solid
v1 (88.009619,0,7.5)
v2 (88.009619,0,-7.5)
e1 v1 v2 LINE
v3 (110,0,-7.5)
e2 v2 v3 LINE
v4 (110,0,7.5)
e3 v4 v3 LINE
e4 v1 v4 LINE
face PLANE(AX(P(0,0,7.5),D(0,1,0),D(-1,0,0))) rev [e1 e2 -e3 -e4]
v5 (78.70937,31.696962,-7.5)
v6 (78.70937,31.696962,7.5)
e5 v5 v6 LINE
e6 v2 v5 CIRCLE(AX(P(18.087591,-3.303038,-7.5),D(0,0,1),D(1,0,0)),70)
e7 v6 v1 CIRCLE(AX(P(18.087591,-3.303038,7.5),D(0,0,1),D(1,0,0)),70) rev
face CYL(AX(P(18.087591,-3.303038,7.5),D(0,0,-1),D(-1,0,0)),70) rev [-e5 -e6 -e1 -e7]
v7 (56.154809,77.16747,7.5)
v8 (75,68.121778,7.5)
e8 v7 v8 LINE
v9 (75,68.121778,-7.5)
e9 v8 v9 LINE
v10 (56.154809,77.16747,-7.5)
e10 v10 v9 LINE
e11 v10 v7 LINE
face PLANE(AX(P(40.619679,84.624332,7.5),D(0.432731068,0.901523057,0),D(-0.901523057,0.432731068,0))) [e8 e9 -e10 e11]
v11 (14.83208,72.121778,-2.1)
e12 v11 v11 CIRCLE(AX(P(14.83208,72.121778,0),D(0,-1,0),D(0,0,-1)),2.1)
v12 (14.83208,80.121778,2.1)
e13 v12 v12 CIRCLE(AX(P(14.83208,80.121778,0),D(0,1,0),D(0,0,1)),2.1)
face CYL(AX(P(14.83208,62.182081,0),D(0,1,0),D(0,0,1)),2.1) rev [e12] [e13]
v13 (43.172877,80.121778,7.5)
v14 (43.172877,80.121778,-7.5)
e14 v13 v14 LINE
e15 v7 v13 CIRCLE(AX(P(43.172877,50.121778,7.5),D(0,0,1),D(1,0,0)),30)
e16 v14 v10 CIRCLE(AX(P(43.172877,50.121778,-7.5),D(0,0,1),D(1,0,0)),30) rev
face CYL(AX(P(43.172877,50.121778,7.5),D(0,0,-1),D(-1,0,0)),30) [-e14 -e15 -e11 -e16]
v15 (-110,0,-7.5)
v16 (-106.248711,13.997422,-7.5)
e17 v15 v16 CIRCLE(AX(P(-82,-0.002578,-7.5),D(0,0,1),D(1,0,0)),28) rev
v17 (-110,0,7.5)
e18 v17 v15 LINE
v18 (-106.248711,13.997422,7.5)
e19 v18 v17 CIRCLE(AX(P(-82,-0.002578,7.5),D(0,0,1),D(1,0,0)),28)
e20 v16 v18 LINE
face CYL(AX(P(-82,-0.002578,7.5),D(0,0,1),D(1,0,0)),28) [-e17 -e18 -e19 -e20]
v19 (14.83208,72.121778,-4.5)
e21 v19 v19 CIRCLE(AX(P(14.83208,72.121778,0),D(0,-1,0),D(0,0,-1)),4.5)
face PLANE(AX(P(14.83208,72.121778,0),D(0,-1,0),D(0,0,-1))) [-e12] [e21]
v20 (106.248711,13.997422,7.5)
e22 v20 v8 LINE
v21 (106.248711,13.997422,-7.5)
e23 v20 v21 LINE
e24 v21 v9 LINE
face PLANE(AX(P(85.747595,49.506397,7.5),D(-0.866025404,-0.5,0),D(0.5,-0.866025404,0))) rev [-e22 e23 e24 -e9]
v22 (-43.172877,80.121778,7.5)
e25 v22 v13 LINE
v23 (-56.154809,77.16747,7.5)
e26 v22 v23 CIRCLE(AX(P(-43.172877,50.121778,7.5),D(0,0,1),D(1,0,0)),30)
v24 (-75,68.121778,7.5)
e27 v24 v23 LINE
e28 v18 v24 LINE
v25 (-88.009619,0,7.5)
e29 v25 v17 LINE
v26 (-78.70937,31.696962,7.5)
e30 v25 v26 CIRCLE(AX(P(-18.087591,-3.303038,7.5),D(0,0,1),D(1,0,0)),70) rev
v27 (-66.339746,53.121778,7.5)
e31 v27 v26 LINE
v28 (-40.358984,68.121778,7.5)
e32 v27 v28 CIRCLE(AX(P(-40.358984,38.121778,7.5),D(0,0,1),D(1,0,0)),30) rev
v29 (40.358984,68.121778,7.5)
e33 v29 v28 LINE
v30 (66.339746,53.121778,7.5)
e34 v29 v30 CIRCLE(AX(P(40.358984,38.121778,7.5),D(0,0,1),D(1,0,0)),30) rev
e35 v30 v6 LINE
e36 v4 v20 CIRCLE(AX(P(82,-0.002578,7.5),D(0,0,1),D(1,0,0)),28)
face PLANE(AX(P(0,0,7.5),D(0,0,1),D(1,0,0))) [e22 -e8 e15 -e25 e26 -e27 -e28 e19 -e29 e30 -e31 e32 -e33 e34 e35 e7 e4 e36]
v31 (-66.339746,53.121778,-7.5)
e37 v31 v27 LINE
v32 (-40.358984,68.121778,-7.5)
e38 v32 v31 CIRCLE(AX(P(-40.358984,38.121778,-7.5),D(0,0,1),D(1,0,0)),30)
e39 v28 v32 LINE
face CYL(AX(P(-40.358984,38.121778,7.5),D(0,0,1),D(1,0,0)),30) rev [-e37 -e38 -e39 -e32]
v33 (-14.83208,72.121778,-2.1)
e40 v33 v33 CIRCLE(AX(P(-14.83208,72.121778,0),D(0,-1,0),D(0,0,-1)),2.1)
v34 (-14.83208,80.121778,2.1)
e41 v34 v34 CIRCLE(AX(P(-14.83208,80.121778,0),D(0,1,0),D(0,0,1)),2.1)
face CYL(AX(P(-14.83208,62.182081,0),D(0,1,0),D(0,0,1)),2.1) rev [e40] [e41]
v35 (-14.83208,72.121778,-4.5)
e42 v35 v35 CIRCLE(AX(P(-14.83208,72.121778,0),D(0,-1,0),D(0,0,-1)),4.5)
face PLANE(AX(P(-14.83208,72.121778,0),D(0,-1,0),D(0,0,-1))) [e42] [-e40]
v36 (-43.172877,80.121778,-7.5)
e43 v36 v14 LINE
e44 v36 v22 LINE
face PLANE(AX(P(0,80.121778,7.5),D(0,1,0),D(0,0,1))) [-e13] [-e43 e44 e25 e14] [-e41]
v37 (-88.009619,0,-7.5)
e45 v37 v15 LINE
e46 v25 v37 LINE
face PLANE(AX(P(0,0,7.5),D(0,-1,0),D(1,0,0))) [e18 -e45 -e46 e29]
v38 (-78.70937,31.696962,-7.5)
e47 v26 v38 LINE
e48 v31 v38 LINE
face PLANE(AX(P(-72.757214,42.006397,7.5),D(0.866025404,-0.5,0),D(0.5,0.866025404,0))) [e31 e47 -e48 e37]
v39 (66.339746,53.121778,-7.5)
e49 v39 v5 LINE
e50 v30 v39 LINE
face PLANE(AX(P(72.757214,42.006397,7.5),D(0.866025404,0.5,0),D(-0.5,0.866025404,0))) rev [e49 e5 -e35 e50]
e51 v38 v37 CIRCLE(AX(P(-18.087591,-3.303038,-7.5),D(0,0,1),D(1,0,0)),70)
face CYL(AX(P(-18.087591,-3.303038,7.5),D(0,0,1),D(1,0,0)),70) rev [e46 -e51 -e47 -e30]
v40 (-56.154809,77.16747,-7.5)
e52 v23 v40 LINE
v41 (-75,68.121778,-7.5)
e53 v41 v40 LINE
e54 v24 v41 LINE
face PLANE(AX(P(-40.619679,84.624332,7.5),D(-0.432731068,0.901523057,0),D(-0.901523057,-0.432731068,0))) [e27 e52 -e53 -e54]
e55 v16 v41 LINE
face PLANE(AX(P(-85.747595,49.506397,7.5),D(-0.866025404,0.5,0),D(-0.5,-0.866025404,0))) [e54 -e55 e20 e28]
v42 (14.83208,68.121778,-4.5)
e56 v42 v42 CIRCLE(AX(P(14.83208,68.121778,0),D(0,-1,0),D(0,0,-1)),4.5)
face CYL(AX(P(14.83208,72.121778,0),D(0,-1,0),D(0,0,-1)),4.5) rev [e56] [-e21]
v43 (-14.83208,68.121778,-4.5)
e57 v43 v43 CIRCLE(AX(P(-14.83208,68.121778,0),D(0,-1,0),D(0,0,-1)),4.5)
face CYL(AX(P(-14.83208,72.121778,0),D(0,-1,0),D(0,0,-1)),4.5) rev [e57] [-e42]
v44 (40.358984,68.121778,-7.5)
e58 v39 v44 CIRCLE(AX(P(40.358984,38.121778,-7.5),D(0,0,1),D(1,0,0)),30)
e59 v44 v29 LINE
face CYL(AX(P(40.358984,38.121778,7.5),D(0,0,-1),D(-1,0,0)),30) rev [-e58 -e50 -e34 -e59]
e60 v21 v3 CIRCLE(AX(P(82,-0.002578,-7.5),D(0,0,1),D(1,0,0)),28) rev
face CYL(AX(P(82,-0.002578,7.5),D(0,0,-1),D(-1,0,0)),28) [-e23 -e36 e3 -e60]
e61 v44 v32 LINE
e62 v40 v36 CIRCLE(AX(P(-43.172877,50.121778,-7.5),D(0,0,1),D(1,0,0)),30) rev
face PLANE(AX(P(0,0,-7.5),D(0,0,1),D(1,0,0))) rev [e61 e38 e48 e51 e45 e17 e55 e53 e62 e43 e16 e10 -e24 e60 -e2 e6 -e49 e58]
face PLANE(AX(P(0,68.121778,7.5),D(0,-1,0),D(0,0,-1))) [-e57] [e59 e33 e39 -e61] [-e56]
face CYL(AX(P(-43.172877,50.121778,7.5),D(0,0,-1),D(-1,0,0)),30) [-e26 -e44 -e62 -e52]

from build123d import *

# Parameters (mm, degrees)
BOSS_EXTRUDE1_DEPTH = 7.5
CUT_EXTRUDE1_START  = 80.121778
SKETCH3_R           = 2.1
CUT_EXTRUDE1_DEPTH  = 12
FILLET1_R           = 30
FILLET1_R_2         = 70
FILLET2_R           = 30
FILLET2_R_2         = 28
CUT_EXTRUDE2_START  = 72.121778
SKETCH3_4_R         = 4.5
SKETCH3_4_R_2       = 2.1
CUT_EXTRUDE2_DEPTH  = 6


with BuildPart() as part:
    # Sketch2 → Boss-Extrude1 (new, symmetric)
    with BuildSketch(Plane.XY):
        Polygon((-50, 80.121778265), (-75, 68.121778265), (-110, 7.5), (-110, 0), (-88.009618943, 0), (-88.009618943, 15.588457268), (-57.679491924, 68.121778265), (57.679491924, 68.121778265), (88.009618943, 15.588457268), (88.009618943, 0), (110, 0), (110, 7.5), (75, 68.121778265), (50, 80.121778265), align=None)
    extrude(amount=BOSS_EXTRUDE1_DEPTH, both=True)

    # Sketch3 → Cut-Extrude1 (cut)
    with BuildSketch(Plane(origin=(0, 0, 0), x_dir=(1, 0, 0), z_dir=(0, 1, 0)).offset(CUT_EXTRUDE1_START)):
        with Locations(Location((-14.832079928, 0, 0), (0, 0, 270))):
            Circle(SKETCH3_R)
        with Locations(Location((14.832079928, 0, 0), (0, 0, 270))):
            Circle(SKETCH3_R)
    extrude(amount=-CUT_EXTRUDE1_DEPTH, mode=Mode.SUBTRACT)

    # Fillet1
    # the kernel refuses this fillet: 70, 30 mm, written as the material it adds along each edge
    with BuildSketch(Plane(origin=(-57.679491924, 68.121778265, -7.5), x_dir=(-0.500000000000001, -0.8660254037844382, 0), z_dir=(0, 0, 1)), Plane(origin=(57.679491924, 68.121778265, -7.5), x_dir=(-1, 0, 0), z_dir=(0, 0, 1))) as fillet1_piece_1:
        with BuildLine():
            CenterArc((FILLET1_R * 0.57735026919, FILLET1_R), FILLET1_R, 210, 60)
            Line((-FILLET1_R * 0.288675134595, FILLET1_R * 0.5), (-FILLET1_R * 0.305995642671, FILLET1_R * 0.49))
            Line((-FILLET1_R * 0.305995642671, FILLET1_R * 0.49), (-FILLET1_R * 0.0115470053838, -FILLET1_R * 0.02))
            Line((-FILLET1_R * 0.0115470053838, -FILLET1_R * 0.02), (FILLET1_R * 0.57735026919, -FILLET1_R * 0.02))
            Line((FILLET1_R * 0.57735026919, -FILLET1_R * 0.02), (FILLET1_R * 0.57735026919, 0))
        make_face()
    extrude(amount=15)
    with BuildSketch(Plane(origin=(-88.009618943, 15.588457268, -7.5), x_dir=(0, -1, 0), z_dir=(0, 0, 1))) as fillet1_piece_2:
        with BuildLine():
            CenterArc((18.891495711, 69.922027552), FILLET1_R_2, 240, 27.295421975)
            Line((-16.108504289, 9.300249288), (-16.808504289, 8.087813722))
            Line((-16.808504289, 8.087813722), (-0.7, -1.212435565))
            Line((-0.7, -1.212435565), (0, -1.4))
            ThreePointArc((0, -1.4), (7.794228634, -1.4), (15.522396499, -1.398440551))
            Line((15.522396499, -1.398440551), (15.588457268, 0))
        make_face()
    extrude(amount=15)
    with BuildSketch(Plane(origin=(88.009618943, 15.588457268, 7.5), x_dir=(-0.5000000000000018, 0.8660254037844377, 0), z_dir=(0, 0, -1))) as fillet1_piece_3:
        with BuildLine():
            CenterArc((18.600498575, -70), FILLET1_R_2, 90, 27.295421975)
            Line((-13.5, -7.794228634), (-14.142009972, -6.550113207))
            ThreePointArc((-14.142009972, -6.550113207), (-7.45, -2.684678752), (-0.7, 1.212435565))
            Line((-0.7, 1.212435565), (0, 1.4))
            Line((0, 1.4), (18.600498575, 1.4))
            Line((18.600498575, 1.4), (18.600498575, 0))
        make_face()
    extrude(amount=15)

    # Fillet2
    # the kernel refuses this fillet: 30, 28 mm, written as the material it takes off along each edge
    with BuildSketch(Plane(origin=(-50, 80.121778265, -24.567807798), x_dir=(1, 0, 0), z_dir=(0, 0, 1)), Plane(origin=(50, 80.121778265, -24.567807798), x_dir=(0.9015230574682733, -0.43273106758477164, 0), z_dir=(0, 0, 1))) as fillet2_piece_1:
        with BuildLine():
            CenterArc((FILLET2_R * 0.227570770644, -FILLET2_R), FILLET2_R, 90, 25.641005824)
            Line((-FILLET2_R * 0.205160296941, -FILLET2_R * 0.0984769425317), (0, 0))
            Line((0, 0), (FILLET2_R * 0.227570770644, 0))
        make_face()
    extrude(amount=49.135615597, mode=Mode.SUBTRACT)
    with BuildSketch(Plane(origin=(-110, 7.5, -26.25644347), x_dir=(0.5000000000000017, 0.8660254037844376, 0), z_dir=(0, 0, 1)), Plane(origin=(110, 7.5, -26.25644347), x_dir=(0, -1, 0), z_dir=(0, 0, 1))) as fillet2_piece_2:
        with BuildLine():
            CenterArc((FILLET2_R_2 * 0.267949192431, -FILLET2_R_2), FILLET2_R_2, 90, 30)
            Line((-FILLET2_R_2 * 0.232050807569, -FILLET2_R_2 * 0.133974596216), (0, 0))
            Line((0, 0), (FILLET2_R_2 * 0.267949192431, 0))
        make_face()
    extrude(amount=52.51288694, mode=Mode.SUBTRACT)

    # Sketch3<4> → Cut-Extrude2 (cut)
    # profile 1 of 2: a face of its own
    with BuildSketch(Plane(origin=(0, 0, 0), x_dir=(1, 0, 0), z_dir=(0, 1, 0)).offset(CUT_EXTRUDE2_START)):
        with Locations(Location((-14.832079928, 0, 0), (0, 0, 90))):
            Circle(SKETCH3_4_R)
        with Locations(Location((-14.832079928, 0, 0), (0, 0, 270))):
            Circle(SKETCH3_4_R_2, mode=Mode.SUBTRACT)
    # profile 2 of 2: a face of its own
    with BuildSketch(Plane(origin=(0, 0, 0), x_dir=(1, 0, 0), z_dir=(0, 1, 0)).offset(CUT_EXTRUDE2_START)):
        with Locations(Location((14.832079928, 0, 0), (0, 0, 90))):
            Circle(SKETCH3_4_R)
        with Locations(Location((14.832079928, 0, 0), (0, 0, 270))):
            Circle(SKETCH3_4_R_2, mode=Mode.SUBTRACT)
    extrude(amount=-CUT_EXTRUDE2_DEPTH, mode=Mode.SUBTRACT)


solid = part.part
